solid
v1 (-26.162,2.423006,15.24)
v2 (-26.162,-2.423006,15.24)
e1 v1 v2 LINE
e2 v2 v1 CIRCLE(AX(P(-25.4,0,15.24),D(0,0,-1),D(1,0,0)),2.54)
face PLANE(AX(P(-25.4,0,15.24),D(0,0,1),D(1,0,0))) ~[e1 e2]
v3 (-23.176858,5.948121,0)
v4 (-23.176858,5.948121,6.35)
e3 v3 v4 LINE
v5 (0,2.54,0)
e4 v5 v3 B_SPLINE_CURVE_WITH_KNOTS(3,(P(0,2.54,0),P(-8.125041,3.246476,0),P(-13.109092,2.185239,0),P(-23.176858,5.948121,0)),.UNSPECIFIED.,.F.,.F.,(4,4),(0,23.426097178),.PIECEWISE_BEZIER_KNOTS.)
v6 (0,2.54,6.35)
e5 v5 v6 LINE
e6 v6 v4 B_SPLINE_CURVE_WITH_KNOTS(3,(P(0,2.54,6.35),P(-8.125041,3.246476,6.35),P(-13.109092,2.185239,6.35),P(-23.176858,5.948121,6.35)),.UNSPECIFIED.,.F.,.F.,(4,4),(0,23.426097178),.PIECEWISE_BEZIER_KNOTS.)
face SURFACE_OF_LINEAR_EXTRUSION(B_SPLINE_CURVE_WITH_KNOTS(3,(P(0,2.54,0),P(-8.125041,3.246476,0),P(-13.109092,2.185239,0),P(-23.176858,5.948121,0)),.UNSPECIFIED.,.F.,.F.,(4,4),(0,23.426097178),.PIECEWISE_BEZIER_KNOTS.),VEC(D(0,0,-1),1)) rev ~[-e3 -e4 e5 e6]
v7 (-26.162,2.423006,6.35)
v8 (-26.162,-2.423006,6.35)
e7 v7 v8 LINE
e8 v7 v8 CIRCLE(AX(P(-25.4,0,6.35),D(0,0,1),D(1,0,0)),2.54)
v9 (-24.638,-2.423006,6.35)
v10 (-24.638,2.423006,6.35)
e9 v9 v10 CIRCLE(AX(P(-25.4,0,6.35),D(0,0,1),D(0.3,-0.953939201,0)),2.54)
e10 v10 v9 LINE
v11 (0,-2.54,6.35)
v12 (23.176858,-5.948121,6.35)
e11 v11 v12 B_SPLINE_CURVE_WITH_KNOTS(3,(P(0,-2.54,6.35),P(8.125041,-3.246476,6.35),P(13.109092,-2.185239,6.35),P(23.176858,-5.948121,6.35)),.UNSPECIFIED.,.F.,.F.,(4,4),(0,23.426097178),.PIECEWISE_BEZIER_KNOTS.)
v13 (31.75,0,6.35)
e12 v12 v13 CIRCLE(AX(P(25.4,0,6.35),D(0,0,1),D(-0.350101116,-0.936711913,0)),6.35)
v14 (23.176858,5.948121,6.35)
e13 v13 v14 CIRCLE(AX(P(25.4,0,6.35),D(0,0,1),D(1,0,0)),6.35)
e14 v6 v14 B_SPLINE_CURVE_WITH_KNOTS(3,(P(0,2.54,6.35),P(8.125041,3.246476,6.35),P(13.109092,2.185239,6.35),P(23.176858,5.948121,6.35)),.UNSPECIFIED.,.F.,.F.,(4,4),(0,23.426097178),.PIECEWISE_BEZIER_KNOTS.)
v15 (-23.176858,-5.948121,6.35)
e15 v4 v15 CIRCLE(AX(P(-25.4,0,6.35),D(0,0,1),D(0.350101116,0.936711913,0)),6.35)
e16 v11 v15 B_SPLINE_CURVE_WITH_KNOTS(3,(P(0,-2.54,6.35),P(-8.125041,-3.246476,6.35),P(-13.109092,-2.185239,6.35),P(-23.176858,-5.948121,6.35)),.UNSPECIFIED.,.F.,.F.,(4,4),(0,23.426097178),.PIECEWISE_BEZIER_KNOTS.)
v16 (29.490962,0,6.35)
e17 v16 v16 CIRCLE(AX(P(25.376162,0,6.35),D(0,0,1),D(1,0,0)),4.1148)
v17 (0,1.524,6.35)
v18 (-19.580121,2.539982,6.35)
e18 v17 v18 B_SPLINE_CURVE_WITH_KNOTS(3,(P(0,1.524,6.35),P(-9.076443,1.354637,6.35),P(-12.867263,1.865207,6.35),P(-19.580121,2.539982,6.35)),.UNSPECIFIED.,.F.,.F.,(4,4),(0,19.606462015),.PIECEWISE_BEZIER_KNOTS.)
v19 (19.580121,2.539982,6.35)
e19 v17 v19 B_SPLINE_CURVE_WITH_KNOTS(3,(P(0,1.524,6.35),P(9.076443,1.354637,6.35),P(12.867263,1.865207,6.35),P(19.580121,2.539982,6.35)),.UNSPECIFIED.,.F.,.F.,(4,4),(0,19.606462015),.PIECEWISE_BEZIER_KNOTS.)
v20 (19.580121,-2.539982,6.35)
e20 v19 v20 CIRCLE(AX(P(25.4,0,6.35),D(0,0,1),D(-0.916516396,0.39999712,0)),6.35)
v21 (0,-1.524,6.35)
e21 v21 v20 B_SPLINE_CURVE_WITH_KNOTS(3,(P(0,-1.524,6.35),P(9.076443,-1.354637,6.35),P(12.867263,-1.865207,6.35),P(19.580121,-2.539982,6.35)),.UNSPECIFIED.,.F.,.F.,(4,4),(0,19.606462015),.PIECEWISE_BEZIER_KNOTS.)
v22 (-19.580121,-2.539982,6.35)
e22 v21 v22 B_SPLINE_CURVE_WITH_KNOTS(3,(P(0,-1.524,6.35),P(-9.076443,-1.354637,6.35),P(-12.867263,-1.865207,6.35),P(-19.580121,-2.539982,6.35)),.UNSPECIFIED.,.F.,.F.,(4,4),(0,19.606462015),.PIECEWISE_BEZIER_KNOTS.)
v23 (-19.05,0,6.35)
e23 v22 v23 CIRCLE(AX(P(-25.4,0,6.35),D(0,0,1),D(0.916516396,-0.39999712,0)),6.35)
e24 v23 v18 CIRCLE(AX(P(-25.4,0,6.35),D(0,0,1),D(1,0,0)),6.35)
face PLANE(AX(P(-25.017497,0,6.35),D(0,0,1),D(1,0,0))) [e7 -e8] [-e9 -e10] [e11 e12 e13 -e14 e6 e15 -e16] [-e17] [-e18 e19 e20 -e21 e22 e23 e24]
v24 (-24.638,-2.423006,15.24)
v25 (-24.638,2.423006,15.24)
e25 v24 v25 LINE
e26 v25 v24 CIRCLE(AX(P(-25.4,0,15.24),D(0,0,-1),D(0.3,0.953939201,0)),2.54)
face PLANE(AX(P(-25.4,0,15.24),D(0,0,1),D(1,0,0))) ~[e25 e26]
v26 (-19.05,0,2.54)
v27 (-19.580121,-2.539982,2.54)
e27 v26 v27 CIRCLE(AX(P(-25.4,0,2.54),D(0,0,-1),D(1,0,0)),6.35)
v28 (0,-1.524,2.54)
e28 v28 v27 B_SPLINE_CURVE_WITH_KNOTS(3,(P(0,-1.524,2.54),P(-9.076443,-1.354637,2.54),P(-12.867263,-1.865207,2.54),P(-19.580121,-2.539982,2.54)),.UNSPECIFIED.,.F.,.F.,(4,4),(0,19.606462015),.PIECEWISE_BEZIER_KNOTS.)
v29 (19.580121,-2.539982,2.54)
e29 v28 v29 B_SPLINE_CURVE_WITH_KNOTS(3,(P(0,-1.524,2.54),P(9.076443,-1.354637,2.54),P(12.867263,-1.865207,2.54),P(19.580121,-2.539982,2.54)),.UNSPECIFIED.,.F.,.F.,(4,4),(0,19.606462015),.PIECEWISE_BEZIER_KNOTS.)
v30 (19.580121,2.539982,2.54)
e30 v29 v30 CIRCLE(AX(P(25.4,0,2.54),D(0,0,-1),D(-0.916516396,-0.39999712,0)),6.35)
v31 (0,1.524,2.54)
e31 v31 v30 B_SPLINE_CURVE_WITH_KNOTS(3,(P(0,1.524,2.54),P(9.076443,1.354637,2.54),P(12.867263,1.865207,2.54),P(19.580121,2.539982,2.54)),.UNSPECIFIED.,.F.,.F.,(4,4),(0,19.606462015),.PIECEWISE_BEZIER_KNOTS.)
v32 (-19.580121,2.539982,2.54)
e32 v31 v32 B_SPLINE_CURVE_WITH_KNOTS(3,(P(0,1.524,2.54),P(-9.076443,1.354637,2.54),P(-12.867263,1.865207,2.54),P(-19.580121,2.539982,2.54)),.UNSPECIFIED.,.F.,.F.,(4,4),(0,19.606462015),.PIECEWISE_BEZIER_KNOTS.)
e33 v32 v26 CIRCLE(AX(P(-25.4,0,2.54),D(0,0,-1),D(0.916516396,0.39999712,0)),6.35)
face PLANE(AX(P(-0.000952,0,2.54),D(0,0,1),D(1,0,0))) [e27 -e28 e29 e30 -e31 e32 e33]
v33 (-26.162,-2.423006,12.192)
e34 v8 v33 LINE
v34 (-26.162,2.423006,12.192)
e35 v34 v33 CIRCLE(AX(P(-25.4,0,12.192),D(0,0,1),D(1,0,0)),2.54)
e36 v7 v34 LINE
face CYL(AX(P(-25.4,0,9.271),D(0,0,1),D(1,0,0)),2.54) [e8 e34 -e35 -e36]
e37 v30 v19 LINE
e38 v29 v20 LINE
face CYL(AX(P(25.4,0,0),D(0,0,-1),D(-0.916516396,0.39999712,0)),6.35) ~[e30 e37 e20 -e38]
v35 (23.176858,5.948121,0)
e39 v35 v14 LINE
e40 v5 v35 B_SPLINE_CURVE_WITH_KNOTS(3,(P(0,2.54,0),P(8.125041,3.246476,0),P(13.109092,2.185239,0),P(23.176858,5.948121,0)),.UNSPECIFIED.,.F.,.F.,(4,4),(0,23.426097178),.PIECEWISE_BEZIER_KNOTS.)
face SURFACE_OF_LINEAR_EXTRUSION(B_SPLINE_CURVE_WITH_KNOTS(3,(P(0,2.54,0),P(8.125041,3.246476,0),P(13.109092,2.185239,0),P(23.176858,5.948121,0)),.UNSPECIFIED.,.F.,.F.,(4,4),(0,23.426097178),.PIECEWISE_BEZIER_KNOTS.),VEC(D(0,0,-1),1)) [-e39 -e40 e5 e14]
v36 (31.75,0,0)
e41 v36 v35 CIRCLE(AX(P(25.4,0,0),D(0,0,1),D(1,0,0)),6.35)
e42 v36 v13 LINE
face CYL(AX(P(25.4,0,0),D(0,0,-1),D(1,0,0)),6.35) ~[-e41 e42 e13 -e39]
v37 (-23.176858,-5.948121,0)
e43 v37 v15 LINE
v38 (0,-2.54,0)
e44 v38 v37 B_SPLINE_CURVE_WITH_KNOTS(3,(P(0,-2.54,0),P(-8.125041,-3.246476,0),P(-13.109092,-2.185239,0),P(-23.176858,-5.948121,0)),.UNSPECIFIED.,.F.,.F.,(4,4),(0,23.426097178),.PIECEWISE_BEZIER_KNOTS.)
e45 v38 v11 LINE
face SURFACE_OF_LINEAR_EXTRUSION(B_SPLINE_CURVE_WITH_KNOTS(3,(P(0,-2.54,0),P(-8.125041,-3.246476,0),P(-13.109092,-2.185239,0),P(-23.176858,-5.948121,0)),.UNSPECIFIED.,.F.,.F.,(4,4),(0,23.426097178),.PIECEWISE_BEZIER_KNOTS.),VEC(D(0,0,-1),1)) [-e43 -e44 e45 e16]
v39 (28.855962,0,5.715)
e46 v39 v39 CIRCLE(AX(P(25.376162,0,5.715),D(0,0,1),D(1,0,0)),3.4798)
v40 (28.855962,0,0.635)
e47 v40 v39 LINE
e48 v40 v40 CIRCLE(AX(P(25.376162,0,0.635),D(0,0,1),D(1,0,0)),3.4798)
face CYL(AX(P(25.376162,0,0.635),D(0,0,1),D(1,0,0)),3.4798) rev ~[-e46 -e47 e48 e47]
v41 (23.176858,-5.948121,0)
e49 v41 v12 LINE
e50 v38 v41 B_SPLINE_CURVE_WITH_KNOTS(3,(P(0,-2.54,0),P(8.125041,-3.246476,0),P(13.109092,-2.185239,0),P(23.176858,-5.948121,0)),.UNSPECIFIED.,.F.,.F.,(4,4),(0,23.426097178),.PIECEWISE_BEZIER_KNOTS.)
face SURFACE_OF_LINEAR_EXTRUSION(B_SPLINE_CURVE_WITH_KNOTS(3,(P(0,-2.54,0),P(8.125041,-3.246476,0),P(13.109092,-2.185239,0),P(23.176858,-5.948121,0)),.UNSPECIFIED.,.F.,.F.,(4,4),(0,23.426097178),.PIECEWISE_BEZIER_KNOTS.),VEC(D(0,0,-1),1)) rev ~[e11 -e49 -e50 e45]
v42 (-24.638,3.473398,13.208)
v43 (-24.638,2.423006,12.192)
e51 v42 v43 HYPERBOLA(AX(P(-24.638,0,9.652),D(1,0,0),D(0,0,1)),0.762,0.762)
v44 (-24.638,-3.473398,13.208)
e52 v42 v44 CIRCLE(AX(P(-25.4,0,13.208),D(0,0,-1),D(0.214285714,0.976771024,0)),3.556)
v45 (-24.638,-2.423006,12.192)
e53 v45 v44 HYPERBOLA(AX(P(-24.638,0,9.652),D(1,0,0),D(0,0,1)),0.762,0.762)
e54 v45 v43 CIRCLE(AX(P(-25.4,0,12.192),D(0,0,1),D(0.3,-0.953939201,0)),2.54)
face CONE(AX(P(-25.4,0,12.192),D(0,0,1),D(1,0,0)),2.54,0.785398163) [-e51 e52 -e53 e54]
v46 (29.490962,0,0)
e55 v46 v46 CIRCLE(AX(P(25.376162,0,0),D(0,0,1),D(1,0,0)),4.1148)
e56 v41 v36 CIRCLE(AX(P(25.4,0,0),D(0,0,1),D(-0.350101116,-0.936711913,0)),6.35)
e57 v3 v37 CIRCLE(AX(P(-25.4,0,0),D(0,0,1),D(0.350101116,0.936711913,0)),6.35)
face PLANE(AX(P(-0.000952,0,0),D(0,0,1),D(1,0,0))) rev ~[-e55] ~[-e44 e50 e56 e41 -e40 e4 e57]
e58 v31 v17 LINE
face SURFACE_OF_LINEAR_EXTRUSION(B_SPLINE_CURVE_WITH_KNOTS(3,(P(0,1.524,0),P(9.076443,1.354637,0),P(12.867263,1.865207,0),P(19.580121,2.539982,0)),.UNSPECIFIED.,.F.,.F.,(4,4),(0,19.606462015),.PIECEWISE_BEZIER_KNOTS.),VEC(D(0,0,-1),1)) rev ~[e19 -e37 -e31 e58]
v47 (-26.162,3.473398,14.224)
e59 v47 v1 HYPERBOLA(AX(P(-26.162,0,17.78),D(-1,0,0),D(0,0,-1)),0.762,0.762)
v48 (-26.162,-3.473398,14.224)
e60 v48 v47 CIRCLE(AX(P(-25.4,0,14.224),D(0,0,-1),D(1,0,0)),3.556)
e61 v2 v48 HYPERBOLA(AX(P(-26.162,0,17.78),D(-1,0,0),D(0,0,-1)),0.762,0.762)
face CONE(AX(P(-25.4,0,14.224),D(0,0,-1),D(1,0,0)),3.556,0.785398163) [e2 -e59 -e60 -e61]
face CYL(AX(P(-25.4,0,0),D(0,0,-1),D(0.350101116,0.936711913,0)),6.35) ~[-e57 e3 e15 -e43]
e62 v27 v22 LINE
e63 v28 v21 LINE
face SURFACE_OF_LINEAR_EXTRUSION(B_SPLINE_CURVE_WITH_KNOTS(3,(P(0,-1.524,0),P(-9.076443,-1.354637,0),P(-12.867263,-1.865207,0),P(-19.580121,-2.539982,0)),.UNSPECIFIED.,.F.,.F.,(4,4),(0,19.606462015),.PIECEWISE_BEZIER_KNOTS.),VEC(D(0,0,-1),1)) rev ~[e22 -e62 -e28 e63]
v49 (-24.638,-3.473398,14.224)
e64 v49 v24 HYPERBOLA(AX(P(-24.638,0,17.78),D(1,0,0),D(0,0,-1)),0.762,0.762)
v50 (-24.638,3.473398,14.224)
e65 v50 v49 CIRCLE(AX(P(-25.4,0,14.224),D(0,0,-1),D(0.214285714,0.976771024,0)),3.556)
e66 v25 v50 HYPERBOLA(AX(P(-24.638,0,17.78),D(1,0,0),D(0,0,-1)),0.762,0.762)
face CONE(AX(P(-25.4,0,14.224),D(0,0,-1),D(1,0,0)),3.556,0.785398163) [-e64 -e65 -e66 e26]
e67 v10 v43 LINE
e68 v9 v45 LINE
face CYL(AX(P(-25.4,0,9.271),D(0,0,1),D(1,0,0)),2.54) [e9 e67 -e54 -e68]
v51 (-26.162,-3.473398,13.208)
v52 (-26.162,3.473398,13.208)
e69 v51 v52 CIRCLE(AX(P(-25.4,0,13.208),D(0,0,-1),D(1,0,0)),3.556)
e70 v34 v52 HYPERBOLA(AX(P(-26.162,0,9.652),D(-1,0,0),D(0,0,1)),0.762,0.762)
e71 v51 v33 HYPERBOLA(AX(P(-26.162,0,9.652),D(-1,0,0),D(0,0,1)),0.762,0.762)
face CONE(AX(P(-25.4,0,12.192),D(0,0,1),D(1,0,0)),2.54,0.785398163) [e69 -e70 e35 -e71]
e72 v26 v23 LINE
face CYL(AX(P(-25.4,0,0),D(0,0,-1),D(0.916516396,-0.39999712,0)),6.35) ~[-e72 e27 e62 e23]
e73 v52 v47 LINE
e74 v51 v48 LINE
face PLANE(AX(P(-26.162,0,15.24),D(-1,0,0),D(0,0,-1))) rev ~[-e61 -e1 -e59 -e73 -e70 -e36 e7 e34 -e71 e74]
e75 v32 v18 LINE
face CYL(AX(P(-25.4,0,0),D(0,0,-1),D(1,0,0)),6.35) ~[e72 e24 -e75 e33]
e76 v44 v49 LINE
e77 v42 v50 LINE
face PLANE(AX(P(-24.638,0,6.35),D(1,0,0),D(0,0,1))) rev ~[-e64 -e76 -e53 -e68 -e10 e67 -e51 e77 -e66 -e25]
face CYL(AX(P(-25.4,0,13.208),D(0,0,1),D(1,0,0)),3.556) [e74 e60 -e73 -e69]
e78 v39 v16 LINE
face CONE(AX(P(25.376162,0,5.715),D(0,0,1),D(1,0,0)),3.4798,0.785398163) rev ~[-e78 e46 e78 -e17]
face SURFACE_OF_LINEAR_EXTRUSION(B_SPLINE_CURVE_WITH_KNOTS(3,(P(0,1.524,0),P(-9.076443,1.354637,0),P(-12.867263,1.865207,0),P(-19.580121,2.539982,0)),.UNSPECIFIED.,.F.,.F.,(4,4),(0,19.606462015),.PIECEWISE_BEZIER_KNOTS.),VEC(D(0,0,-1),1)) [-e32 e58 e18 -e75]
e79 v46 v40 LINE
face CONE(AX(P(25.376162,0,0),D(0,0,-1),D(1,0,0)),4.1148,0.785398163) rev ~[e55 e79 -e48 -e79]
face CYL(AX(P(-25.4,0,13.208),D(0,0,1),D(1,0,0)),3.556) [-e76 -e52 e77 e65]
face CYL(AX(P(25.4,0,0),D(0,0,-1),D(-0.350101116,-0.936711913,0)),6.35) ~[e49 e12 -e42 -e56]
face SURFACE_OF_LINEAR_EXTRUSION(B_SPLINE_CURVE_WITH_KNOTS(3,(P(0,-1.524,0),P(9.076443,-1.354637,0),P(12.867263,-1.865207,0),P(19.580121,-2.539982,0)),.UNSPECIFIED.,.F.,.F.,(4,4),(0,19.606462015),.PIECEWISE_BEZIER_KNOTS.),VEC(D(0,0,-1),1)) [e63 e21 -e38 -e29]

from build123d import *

# Parameters (mm, degrees)
F2_DEPTH = 6.35
F1_W     = 1.778
F1_H     = 3.048
F1_H_2   = 5.842
F1_W_2   = 0.762
F5_DEPTH = 12.7
F6_DEPTH = 2.54


# Not quite as in the source:
# - a feature names something its author has since deleted; it is built from what else it names


with BuildPart() as f2:
    # F0 (on Top) → F2 (new body)
    with BuildSketch(Plane.XY):
        with BuildLine():
            ThreePointArc((-19.5801208863, -2.5399817128), (-19.1839428746, -1.2973564714), (-19.05, 0))
            ThreePointArc((-19.05, 0), (-19.1839428746, 1.2973564714), (-19.5801208863, 2.5399817128))
            ThreePointArc((-19.5801208863, 2.5399817128), (-21.0323461368, 4.6093491657), (-23.1768579109, 5.9481206487))
            ThreePointArc((-23.1768579109, 5.9481206487), (-31.75, 0), (-23.1768579109, -5.9481206487))
            ThreePointArc((-23.1768579109, -5.9481206487), (-21.0323461368, -4.6093491657), (-19.5801208863, -2.5399817128))
        make_face()
        with BuildLine():
            ThreePointArc((-23.1768579109, 5.9481206487), (-21.0323461368, 4.6093491657), (-19.5801208863, 2.5399817128))
            add(Edge.make_bspline(
                [(0, 1.524), (-9.0764431036, 1.3546369813), (-12.8672626316, 1.8652065321), (-19.5801208863, 2.5399817128)],
                knots=[0, 0, 0, 0, 19.6064620154, 19.6064620154, 19.6064620154, 19.6064620154], degree=3))
            add(Edge.make_bspline(
                [(0, 1.524), (9.0764431036, 1.3546369813), (12.8672626316, 1.8652065321), (19.5801208863, 2.5399817128)],
                knots=[0, 0, 0, 0, 19.6064620154, 19.6064620154, 19.6064620154, 19.6064620154], degree=3))
            ThreePointArc((19.5801208863, 2.5399817128), (21.0323461368, 4.6093491657), (23.1768579109, 5.9481206487))
            add(Edge.make_bspline(
                [(0, 2.54), (8.1250406802, 3.246476237), (13.1090918084, 2.1852389104), (23.1768579109, 5.9481206487)],
                knots=[0, 0, 0, 0, 23.4260971776, 23.4260971776, 23.4260971776, 23.4260971776], degree=3))
            add(Edge.make_bspline(
                [(0, 2.54), (-8.1250406802, 3.246476237), (-13.1090918084, 2.1852389104), (-23.1768579109, 5.9481206487)],
                knots=[0, 0, 0, 0, 23.4260971776, 23.4260971776, 23.4260971776, 23.4260971776], degree=3))
        make_face()
        with BuildLine():
            add(Edge.make_bspline(
                [(0, -1.524), (-9.0764431036, -1.3546369813), (-12.8672626316, -1.8652065321), (-19.5801208863, -2.5399817128)],
                knots=[0, 0, 0, 0, 19.6064620154, 19.6064620154, 19.6064620154, 19.6064620154], degree=3))
            ThreePointArc((-19.5801208863, -2.5399817128), (-21.0323461368, -4.6093491657), (-23.1768579109, -5.9481206487))
            add(Edge.make_bspline(
                [(0, -2.54), (-8.1250406802, -3.246476237), (-13.1090918084, -2.1852389104), (-23.1768579109, -5.9481206487)],
                knots=[0, 0, 0, 0, 23.4260971776, 23.4260971776, 23.4260971776, 23.4260971776], degree=3))
            add(Edge.make_bspline(
                [(0, -2.54), (8.1250406802, -3.246476237), (13.1090918084, -2.1852389104), (23.1768579109, -5.9481206487)],
                knots=[0, 0, 0, 0, 23.4260971776, 23.4260971776, 23.4260971776, 23.4260971776], degree=3))
            ThreePointArc((23.1768579109, -5.9481206487), (21.0323461368, -4.6093491657), (19.5801208863, -2.5399817128))
            add(Edge.make_bspline(
                [(0, -1.524), (9.0764431036, -1.3546369813), (12.8672626316, -1.8652065321), (19.5801208863, -2.5399817128)],
                knots=[0, 0, 0, 0, 19.6064620154, 19.6064620154, 19.6064620154, 19.6064620154], degree=3))
        make_face()
        with BuildLine():
            ThreePointArc((23.1768579109, 5.9481206487), (21.0323461368, 4.6093491657), (19.5801208863, 2.5399817128))
            ThreePointArc((19.5801208863, 2.5399817128), (19.05, 0), (19.5801208863, -2.5399817128))
            ThreePointArc((19.5801208863, -2.5399817128), (21.0323461368, -4.6093491657), (23.1768579109, -5.9481206487))
            ThreePointArc((23.1768579109, -5.9481206487), (29.019775389, -5.2172527381), (31.75, 0))
            ThreePointArc((31.75, 0), (29.019775389, 5.2172527381), (23.1768579109, 5.9481206487))
        make_face()
    extrude(amount=F2_DEPTH)

    # F1 (on Front) → F3 (revolve, cut)
    with BuildSketch(Plane.XZ):
        Polygon((25.376161883, 6.35), (25.376161883, 0), (29.490961883, 0), (28.855961883, 0.635), (28.855961883, 5.715), (29.490961883, 6.35), align=None)
    revolve(axis=Axis((25.376161883, 0, 3.175), (0, 0, 1)), mode=Mode.SUBTRACT)

    # F1 (on Front) → F4 (revolve)
    with BuildSketch(Plane.XZ):
        Polygon((-22.86, 15.24), (-22.86, 12.192), (-21.844, 13.208), (-21.844, 14.224), align=None)
        with Locations((-23.749, 13.716)):
            Rectangle(F1_W, F1_H)
        with Locations((-27.051, 13.716)):
            Rectangle(F1_W, F1_H)
        Polygon((-28.956, 13.208), (-27.94, 12.192), (-27.94, 15.24), (-28.956, 14.224), align=None)
        with Locations((-27.051, 9.271)):
            Rectangle(F1_W, F1_H_2)
        with Locations((-23.749, 9.271)):
            Rectangle(F1_W, F1_H_2)
    revolve(axis=Axis((-25.4, 0, 10.795), (0, 0, 1)))

    # F1 (on Front) → F5 (cut, symmetric)
    with BuildSketch(Plane.XZ):
        with Locations((-25.019, 13.716)):
            Rectangle(F1_W_2, F1_H)
        with Locations((-25.781, 13.716)):
            Rectangle(F1_W_2, F1_H)
        with Locations((-25.019, 9.271)):
            Rectangle(F1_W_2, F1_H_2)
        with Locations((-25.781, 9.271)):
            Rectangle(F1_W_2, F1_H_2)
    extrude(amount=F5_DEPTH, both=True, mode=Mode.SUBTRACT)

    # F0 (on Top) → F6 (join)
    with BuildSketch(Plane.XY):
        with BuildLine():
            ThreePointArc((-19.5801208863, 2.5399817128), (-19.1839428746, 1.2973564714), (-19.05, 0))
            ThreePointArc((-19.05, 0), (-19.1839428746, -1.2973564714), (-19.5801208863, -2.5399817128))
            add(Edge.make_bspline(
                [(0, -1.524), (-9.0764431036, -1.3546369813), (-12.8672626316, -1.8652065321), (-19.5801208863, -2.5399817128)],
                knots=[0, 0, 0, 0, 19.6064620154, 19.6064620154, 19.6064620154, 19.6064620154], degree=3))
            add(Edge.make_bspline(
                [(0, -1.524), (9.0764431036, -1.3546369813), (12.8672626316, -1.8652065321), (19.5801208863, -2.5399817128)],
                knots=[0, 0, 0, 0, 19.6064620154, 19.6064620154, 19.6064620154, 19.6064620154], degree=3))
            ThreePointArc((19.5801208863, -2.5399817128), (19.05, 0), (19.5801208863, 2.5399817128))
            add(Edge.make_bspline(
                [(0, 1.524), (9.0764431036, 1.3546369813), (12.8672626316, 1.8652065321), (19.5801208863, 2.5399817128)],
                knots=[0, 0, 0, 0, 19.6064620154, 19.6064620154, 19.6064620154, 19.6064620154], degree=3))
            add(Edge.make_bspline(
                [(0, 1.524), (-9.0764431036, 1.3546369813), (-12.8672626316, 1.8652065321), (-19.5801208863, 2.5399817128)],
                knots=[0, 0, 0, 0, 19.6064620154, 19.6064620154, 19.6064620154, 19.6064620154], degree=3))
        make_face()
    extrude(amount=F6_DEPTH)


solid = f2.part
